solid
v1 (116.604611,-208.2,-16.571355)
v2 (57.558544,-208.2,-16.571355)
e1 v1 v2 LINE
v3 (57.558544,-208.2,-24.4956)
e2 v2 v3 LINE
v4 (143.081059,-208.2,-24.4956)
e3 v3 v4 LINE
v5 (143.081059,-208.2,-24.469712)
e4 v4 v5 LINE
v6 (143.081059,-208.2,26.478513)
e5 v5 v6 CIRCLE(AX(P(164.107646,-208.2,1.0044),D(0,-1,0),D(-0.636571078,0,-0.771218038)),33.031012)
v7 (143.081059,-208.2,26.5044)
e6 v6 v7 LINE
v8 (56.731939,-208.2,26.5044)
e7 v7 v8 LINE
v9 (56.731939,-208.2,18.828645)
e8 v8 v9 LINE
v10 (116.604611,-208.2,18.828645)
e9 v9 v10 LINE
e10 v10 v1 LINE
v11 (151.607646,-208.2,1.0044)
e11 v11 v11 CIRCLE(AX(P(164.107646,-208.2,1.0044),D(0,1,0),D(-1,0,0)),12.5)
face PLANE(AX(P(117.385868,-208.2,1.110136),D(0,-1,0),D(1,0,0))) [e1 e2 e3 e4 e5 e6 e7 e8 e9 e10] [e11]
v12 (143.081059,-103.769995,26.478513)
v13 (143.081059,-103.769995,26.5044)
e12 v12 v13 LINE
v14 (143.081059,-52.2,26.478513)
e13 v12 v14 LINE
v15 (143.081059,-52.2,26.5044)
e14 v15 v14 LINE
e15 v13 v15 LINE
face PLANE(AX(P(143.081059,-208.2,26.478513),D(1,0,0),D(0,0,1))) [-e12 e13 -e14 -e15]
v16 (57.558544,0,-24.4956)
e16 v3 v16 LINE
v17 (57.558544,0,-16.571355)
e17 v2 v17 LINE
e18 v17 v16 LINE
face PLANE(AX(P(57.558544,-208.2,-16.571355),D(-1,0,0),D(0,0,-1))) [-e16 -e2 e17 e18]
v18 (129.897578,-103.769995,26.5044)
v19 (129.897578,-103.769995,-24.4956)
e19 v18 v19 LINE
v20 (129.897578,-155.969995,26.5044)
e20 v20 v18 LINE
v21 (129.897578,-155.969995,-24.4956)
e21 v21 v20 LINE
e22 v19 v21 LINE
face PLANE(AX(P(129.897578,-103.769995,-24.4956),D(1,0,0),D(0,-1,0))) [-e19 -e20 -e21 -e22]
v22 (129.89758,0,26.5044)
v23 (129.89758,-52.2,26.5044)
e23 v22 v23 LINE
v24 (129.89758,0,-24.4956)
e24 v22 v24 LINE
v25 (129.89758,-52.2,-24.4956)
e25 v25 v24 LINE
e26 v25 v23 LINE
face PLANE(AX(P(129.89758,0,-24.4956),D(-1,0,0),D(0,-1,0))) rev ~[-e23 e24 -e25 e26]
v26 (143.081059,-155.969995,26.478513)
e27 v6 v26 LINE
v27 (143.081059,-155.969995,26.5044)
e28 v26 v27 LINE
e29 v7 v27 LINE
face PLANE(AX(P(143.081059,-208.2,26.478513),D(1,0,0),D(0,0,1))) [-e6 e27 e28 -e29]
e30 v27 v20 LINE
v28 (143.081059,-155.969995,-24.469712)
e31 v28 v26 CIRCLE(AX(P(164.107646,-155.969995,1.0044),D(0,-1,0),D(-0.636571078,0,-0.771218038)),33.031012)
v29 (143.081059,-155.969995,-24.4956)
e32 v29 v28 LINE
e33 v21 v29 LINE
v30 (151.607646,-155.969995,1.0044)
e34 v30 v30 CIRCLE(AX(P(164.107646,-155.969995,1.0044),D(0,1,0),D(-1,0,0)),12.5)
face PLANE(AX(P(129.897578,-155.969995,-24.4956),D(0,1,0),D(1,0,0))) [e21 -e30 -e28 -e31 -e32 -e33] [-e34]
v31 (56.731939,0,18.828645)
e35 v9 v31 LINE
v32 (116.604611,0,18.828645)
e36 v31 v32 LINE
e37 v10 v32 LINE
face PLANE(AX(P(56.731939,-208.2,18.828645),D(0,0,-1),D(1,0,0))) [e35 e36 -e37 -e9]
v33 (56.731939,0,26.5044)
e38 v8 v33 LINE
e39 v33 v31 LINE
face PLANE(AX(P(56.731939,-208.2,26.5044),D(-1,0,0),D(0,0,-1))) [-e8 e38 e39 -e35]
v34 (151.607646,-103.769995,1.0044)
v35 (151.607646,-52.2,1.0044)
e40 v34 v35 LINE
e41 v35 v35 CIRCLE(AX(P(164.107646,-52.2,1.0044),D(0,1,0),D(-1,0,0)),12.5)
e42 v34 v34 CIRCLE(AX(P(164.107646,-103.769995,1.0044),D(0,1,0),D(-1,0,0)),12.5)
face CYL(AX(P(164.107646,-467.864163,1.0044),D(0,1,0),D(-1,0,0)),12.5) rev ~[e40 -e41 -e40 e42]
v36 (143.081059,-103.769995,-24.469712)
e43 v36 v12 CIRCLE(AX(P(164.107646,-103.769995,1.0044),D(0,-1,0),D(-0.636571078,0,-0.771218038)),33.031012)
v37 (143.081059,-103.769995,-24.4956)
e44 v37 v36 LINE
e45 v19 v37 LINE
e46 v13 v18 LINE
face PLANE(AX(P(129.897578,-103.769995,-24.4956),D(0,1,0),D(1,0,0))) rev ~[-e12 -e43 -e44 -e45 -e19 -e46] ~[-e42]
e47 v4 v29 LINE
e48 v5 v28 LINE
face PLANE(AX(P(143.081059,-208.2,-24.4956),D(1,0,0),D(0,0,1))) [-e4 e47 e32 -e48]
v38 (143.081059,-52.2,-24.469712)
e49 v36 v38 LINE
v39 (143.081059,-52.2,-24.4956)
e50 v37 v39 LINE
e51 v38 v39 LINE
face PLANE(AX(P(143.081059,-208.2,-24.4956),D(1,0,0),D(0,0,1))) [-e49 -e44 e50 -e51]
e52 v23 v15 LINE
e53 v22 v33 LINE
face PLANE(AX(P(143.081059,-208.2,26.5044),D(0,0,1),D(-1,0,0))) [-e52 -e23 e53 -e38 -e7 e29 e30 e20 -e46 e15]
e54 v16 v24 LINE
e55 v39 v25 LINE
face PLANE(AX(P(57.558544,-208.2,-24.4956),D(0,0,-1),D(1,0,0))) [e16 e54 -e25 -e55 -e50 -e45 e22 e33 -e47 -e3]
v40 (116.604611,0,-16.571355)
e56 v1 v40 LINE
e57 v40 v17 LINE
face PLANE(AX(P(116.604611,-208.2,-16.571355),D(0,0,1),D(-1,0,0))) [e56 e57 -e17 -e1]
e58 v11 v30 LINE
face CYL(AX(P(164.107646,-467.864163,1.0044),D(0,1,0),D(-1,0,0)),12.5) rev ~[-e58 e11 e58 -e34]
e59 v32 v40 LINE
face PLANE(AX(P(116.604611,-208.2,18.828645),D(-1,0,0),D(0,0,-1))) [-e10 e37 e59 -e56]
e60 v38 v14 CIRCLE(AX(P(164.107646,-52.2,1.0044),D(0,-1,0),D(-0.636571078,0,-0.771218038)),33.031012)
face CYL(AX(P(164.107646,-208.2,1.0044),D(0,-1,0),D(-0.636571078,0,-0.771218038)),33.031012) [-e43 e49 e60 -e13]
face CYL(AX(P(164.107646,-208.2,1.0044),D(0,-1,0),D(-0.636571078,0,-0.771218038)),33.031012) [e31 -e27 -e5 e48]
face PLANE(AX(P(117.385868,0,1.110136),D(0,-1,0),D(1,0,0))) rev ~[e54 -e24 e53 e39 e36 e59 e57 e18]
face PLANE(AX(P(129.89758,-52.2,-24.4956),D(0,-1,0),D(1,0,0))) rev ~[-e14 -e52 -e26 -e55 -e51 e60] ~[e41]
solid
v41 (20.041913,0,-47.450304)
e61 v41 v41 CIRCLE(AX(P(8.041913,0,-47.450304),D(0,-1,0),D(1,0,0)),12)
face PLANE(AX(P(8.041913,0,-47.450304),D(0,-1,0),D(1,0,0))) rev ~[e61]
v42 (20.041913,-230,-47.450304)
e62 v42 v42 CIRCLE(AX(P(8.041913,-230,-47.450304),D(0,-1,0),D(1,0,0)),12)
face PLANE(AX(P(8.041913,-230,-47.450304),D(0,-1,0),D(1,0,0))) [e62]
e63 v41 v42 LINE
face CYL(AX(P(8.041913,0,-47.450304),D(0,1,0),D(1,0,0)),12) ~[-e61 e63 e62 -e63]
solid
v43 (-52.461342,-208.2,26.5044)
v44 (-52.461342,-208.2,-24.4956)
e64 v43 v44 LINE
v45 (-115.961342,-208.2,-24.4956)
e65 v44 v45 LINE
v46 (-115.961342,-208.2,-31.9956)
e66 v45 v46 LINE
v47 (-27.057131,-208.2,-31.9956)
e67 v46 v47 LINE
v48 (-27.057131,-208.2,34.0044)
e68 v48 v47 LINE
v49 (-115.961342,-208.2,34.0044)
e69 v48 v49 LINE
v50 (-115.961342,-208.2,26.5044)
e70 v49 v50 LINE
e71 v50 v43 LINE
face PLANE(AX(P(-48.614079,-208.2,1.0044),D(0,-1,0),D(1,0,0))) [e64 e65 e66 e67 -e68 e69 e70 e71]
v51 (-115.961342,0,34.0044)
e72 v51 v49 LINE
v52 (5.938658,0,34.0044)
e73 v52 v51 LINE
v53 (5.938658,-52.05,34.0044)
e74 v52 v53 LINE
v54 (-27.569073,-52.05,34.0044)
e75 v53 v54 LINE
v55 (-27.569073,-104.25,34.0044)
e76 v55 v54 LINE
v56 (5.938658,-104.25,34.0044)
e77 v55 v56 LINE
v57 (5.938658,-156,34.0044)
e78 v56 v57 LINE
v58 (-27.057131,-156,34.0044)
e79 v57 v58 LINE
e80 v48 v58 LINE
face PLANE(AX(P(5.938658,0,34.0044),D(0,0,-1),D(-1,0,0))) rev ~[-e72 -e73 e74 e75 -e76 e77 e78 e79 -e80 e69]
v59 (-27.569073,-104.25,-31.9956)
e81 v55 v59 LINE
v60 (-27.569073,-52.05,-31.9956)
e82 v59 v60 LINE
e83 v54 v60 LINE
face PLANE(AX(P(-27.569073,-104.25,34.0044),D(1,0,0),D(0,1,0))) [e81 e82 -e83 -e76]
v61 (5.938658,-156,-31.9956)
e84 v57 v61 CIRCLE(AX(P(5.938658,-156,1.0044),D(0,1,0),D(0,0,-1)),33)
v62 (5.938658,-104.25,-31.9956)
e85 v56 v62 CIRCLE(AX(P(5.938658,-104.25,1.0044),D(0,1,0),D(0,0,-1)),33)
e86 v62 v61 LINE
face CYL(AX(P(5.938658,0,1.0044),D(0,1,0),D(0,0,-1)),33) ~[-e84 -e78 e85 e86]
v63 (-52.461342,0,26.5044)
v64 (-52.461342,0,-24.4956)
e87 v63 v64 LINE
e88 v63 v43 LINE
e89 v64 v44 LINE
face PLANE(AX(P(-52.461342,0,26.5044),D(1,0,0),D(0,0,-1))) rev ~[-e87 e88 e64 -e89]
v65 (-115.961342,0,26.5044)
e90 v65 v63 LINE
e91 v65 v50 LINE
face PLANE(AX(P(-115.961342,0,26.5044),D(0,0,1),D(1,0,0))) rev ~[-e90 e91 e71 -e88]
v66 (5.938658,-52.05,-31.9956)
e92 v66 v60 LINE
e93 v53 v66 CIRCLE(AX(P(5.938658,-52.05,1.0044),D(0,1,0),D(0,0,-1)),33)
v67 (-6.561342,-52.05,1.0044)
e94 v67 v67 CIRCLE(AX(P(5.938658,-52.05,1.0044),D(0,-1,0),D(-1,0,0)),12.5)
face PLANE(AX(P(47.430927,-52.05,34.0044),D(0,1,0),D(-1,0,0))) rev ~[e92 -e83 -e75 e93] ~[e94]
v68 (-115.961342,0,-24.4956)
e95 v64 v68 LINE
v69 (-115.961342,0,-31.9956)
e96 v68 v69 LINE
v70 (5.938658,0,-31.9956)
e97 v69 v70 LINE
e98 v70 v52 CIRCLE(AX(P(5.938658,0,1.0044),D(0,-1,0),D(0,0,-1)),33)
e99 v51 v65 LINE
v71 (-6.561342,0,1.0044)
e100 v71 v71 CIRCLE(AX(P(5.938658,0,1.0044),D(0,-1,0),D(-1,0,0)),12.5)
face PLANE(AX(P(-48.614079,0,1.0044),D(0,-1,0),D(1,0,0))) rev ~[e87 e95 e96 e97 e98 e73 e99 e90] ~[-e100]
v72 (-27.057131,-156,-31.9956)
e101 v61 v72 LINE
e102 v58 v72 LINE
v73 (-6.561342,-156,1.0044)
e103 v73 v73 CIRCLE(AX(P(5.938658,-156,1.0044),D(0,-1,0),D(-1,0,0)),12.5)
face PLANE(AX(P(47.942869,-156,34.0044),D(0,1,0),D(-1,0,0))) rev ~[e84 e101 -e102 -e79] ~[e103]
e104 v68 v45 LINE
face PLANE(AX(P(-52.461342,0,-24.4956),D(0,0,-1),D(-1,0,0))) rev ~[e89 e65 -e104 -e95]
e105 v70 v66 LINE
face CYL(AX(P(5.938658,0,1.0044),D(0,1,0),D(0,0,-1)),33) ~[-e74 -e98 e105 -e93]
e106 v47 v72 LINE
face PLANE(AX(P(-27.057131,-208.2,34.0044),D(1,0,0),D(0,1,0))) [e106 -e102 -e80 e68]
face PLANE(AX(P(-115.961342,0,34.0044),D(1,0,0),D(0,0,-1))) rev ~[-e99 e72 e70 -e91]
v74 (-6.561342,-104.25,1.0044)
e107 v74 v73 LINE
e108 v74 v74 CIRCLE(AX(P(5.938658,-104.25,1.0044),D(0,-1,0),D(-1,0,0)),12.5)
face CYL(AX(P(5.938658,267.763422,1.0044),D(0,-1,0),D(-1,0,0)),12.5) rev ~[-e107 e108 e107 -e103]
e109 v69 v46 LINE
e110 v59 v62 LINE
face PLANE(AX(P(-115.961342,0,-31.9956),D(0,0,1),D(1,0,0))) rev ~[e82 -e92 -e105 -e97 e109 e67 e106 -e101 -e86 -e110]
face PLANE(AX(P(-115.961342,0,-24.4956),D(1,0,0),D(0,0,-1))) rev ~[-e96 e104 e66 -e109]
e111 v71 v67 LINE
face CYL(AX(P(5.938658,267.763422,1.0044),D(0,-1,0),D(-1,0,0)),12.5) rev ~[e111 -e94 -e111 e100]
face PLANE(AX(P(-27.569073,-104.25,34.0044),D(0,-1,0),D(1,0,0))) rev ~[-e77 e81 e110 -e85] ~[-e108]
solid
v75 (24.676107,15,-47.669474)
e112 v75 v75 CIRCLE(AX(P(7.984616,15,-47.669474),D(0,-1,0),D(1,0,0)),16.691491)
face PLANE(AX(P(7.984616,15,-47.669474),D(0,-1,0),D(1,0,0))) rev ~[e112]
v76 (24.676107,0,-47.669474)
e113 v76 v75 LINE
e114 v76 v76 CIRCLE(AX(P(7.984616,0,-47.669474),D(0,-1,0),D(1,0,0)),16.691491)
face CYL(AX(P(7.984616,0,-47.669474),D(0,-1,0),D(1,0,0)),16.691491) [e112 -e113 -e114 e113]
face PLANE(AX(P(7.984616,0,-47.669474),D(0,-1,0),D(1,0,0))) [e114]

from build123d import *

# Parameters (mm, degrees)
F1_DEPTH  = 208.2
F3_D      = 25
F7_DEPTH  = 208.2
F9_D      = 25
F10_W     = 33.5077310764
F10_H     = 52.2
F10_W_2   = 41.4922689236
F10_W_3   = 42.0042114099
F10_W_4   = 32.9957885901
F10_W_5   = 75
F11_DEPTH = 66.0320122191
F12_W     = 75
F12_H     = 52.2
F13_DEPTH = 75
F14_R     = 12
F15_DEPTH = 230
F16_R     = 16.6914911111
F17_DEPTH = 15


with BuildPart() as f1:
    # F0 (on Front) → F1 (new body)
    with BuildSketch(Plane.XZ):
        with BuildLine():
            Line((5.9386579103, 34.0044003353), (-115.9613420897, 34.0044003353))
            Line((-115.9613420897, 34.0044003353), (-115.9613420897, 26.5044003353))
            Line((-115.9613420897, 26.5044003353), (-52.4613420897, 26.5044003353))
            Line((-52.4613420897, 26.5044003353), (-52.4613420897, -24.4955996647))
            Line((-52.4613420897, -24.4955996647), (-115.9613420897, -24.4955996647))
            Line((-115.9613420897, -24.4955996647), (-115.9613420897, -31.9955996647))
            Line((-115.9613420897, -31.9955996647), (5.9386579103, -31.9955996647))
            ThreePointArc((5.9386579103, -31.9955996647), (38.9386579103, 1.0044003353), (5.9386579103, 34.0044003353))
        make_face()
    extrude(amount=F1_DEPTH)

    # F3 (through all)
    with Locations(Plane(origin=(0, 0, 0), x_dir=(1, 0, 0), z_dir=(0, 1, 0))):
        with Locations((5.9386579103, -1.0044003353)):
            Hole(F3_D / 2)


with BuildPart() as f4_1:
    # F4: copy of F1
    add(f1.part.moved(Location((158.2, 0, 0))))


with BuildPart() as f7:
    # F5 (on face) → F7 (new body)
    with BuildSketch(Plane.XZ.offset(208.2)):
        with BuildLine():
            Line((143.0810586394, 26.5044003353), (56.7319393158, 26.5044003353))
            Line((56.7319393158, 26.5044003353), (56.7319393158, 18.8286447808))
            Line((56.7319393158, 18.8286447808), (116.6046112776, 18.8286447808))
            Line((116.6046112776, 18.8286447808), (116.6046112776, -16.5713552192))
            Line((116.6046112776, -16.5713552192), (57.5585439801, -16.5713552192))
            Line((57.5585439801, -16.5713552192), (57.5585439801, -24.4955996647))
            Line((57.5585439801, -24.4955996647), (143.0810586394, -24.4955996647))
            Line((143.0810586394, -24.4955996647), (143.0810586394, -24.4697121158))
            ThreePointArc((143.0810586394, -24.4697121158), (197.1386579103, 1.0044003353), (143.0810586394, 26.4785127863))
            Line((143.0810586394, 26.4785127863), (143.0810586394, 26.5044003353))
        make_face()
    extrude(amount=-F7_DEPTH)

    # F9 (through all)
    with Locations(Plane.XZ.offset(208.2)):
        with Locations((164.1076456912, 1.0044003353)):
            Hole(F9_D / 2)

    # F12 (on face) → F13 (cut, symmetric)
    with BuildSketch(Plane(origin=(0, 0, -24.4955996647), x_dir=(1, 0, 0), z_dir=(0, 0, -1))):
        with Locations((167.3975795507, 26.1)):
            Rectangle(F12_W, F12_H)
        with Locations((167.3975776881, 129.8699952722)):
            Rectangle(F12_W, F12_H)
    extrude(amount=F13_DEPTH, both=True, mode=Mode.SUBTRACT)


with BuildPart() as f1_1:
    add(f1.part)

    # F10 (on face) → F11 (cut, through all)
    with BuildSketch(Plane.XY.offset(34.0044003353)):
        with Locations((-10.8152076279, -78.15)):
            Rectangle(F10_W, F10_H)
        with Locations((26.6847923721, -78.15)):
            Rectangle(F10_W_2, F10_H)
        with Locations((26.9407636153, -182.1)):
            Rectangle(F10_W_3, F10_H)
        with Locations((-10.5592363847, -182.1)):
            Rectangle(F10_W_4, F10_H)
        with Locations((167.2925822881, -182.1)):
            Rectangle(F10_W_5, F10_H)
    extrude(amount=-F11_DEPTH, mode=Mode.SUBTRACT)


with BuildPart() as f15:
    # F14 (on Front) → F15 (new body)
    with BuildSketch(Plane.XZ):
        with Locations((8.0419126898, -47.4503040314)):
            Circle(F14_R)
    extrude(amount=F15_DEPTH)


with BuildPart() as f17:
    # F16 (on Front) → F17 (new body)
    with BuildSketch(Plane.XZ):
        with Locations((7.9846158624, -47.6694740355)):
            Circle(F16_R)
    extrude(amount=-F17_DEPTH)


solid = Compound([f7.part, f1_1.part, f15.part, f17.part])
